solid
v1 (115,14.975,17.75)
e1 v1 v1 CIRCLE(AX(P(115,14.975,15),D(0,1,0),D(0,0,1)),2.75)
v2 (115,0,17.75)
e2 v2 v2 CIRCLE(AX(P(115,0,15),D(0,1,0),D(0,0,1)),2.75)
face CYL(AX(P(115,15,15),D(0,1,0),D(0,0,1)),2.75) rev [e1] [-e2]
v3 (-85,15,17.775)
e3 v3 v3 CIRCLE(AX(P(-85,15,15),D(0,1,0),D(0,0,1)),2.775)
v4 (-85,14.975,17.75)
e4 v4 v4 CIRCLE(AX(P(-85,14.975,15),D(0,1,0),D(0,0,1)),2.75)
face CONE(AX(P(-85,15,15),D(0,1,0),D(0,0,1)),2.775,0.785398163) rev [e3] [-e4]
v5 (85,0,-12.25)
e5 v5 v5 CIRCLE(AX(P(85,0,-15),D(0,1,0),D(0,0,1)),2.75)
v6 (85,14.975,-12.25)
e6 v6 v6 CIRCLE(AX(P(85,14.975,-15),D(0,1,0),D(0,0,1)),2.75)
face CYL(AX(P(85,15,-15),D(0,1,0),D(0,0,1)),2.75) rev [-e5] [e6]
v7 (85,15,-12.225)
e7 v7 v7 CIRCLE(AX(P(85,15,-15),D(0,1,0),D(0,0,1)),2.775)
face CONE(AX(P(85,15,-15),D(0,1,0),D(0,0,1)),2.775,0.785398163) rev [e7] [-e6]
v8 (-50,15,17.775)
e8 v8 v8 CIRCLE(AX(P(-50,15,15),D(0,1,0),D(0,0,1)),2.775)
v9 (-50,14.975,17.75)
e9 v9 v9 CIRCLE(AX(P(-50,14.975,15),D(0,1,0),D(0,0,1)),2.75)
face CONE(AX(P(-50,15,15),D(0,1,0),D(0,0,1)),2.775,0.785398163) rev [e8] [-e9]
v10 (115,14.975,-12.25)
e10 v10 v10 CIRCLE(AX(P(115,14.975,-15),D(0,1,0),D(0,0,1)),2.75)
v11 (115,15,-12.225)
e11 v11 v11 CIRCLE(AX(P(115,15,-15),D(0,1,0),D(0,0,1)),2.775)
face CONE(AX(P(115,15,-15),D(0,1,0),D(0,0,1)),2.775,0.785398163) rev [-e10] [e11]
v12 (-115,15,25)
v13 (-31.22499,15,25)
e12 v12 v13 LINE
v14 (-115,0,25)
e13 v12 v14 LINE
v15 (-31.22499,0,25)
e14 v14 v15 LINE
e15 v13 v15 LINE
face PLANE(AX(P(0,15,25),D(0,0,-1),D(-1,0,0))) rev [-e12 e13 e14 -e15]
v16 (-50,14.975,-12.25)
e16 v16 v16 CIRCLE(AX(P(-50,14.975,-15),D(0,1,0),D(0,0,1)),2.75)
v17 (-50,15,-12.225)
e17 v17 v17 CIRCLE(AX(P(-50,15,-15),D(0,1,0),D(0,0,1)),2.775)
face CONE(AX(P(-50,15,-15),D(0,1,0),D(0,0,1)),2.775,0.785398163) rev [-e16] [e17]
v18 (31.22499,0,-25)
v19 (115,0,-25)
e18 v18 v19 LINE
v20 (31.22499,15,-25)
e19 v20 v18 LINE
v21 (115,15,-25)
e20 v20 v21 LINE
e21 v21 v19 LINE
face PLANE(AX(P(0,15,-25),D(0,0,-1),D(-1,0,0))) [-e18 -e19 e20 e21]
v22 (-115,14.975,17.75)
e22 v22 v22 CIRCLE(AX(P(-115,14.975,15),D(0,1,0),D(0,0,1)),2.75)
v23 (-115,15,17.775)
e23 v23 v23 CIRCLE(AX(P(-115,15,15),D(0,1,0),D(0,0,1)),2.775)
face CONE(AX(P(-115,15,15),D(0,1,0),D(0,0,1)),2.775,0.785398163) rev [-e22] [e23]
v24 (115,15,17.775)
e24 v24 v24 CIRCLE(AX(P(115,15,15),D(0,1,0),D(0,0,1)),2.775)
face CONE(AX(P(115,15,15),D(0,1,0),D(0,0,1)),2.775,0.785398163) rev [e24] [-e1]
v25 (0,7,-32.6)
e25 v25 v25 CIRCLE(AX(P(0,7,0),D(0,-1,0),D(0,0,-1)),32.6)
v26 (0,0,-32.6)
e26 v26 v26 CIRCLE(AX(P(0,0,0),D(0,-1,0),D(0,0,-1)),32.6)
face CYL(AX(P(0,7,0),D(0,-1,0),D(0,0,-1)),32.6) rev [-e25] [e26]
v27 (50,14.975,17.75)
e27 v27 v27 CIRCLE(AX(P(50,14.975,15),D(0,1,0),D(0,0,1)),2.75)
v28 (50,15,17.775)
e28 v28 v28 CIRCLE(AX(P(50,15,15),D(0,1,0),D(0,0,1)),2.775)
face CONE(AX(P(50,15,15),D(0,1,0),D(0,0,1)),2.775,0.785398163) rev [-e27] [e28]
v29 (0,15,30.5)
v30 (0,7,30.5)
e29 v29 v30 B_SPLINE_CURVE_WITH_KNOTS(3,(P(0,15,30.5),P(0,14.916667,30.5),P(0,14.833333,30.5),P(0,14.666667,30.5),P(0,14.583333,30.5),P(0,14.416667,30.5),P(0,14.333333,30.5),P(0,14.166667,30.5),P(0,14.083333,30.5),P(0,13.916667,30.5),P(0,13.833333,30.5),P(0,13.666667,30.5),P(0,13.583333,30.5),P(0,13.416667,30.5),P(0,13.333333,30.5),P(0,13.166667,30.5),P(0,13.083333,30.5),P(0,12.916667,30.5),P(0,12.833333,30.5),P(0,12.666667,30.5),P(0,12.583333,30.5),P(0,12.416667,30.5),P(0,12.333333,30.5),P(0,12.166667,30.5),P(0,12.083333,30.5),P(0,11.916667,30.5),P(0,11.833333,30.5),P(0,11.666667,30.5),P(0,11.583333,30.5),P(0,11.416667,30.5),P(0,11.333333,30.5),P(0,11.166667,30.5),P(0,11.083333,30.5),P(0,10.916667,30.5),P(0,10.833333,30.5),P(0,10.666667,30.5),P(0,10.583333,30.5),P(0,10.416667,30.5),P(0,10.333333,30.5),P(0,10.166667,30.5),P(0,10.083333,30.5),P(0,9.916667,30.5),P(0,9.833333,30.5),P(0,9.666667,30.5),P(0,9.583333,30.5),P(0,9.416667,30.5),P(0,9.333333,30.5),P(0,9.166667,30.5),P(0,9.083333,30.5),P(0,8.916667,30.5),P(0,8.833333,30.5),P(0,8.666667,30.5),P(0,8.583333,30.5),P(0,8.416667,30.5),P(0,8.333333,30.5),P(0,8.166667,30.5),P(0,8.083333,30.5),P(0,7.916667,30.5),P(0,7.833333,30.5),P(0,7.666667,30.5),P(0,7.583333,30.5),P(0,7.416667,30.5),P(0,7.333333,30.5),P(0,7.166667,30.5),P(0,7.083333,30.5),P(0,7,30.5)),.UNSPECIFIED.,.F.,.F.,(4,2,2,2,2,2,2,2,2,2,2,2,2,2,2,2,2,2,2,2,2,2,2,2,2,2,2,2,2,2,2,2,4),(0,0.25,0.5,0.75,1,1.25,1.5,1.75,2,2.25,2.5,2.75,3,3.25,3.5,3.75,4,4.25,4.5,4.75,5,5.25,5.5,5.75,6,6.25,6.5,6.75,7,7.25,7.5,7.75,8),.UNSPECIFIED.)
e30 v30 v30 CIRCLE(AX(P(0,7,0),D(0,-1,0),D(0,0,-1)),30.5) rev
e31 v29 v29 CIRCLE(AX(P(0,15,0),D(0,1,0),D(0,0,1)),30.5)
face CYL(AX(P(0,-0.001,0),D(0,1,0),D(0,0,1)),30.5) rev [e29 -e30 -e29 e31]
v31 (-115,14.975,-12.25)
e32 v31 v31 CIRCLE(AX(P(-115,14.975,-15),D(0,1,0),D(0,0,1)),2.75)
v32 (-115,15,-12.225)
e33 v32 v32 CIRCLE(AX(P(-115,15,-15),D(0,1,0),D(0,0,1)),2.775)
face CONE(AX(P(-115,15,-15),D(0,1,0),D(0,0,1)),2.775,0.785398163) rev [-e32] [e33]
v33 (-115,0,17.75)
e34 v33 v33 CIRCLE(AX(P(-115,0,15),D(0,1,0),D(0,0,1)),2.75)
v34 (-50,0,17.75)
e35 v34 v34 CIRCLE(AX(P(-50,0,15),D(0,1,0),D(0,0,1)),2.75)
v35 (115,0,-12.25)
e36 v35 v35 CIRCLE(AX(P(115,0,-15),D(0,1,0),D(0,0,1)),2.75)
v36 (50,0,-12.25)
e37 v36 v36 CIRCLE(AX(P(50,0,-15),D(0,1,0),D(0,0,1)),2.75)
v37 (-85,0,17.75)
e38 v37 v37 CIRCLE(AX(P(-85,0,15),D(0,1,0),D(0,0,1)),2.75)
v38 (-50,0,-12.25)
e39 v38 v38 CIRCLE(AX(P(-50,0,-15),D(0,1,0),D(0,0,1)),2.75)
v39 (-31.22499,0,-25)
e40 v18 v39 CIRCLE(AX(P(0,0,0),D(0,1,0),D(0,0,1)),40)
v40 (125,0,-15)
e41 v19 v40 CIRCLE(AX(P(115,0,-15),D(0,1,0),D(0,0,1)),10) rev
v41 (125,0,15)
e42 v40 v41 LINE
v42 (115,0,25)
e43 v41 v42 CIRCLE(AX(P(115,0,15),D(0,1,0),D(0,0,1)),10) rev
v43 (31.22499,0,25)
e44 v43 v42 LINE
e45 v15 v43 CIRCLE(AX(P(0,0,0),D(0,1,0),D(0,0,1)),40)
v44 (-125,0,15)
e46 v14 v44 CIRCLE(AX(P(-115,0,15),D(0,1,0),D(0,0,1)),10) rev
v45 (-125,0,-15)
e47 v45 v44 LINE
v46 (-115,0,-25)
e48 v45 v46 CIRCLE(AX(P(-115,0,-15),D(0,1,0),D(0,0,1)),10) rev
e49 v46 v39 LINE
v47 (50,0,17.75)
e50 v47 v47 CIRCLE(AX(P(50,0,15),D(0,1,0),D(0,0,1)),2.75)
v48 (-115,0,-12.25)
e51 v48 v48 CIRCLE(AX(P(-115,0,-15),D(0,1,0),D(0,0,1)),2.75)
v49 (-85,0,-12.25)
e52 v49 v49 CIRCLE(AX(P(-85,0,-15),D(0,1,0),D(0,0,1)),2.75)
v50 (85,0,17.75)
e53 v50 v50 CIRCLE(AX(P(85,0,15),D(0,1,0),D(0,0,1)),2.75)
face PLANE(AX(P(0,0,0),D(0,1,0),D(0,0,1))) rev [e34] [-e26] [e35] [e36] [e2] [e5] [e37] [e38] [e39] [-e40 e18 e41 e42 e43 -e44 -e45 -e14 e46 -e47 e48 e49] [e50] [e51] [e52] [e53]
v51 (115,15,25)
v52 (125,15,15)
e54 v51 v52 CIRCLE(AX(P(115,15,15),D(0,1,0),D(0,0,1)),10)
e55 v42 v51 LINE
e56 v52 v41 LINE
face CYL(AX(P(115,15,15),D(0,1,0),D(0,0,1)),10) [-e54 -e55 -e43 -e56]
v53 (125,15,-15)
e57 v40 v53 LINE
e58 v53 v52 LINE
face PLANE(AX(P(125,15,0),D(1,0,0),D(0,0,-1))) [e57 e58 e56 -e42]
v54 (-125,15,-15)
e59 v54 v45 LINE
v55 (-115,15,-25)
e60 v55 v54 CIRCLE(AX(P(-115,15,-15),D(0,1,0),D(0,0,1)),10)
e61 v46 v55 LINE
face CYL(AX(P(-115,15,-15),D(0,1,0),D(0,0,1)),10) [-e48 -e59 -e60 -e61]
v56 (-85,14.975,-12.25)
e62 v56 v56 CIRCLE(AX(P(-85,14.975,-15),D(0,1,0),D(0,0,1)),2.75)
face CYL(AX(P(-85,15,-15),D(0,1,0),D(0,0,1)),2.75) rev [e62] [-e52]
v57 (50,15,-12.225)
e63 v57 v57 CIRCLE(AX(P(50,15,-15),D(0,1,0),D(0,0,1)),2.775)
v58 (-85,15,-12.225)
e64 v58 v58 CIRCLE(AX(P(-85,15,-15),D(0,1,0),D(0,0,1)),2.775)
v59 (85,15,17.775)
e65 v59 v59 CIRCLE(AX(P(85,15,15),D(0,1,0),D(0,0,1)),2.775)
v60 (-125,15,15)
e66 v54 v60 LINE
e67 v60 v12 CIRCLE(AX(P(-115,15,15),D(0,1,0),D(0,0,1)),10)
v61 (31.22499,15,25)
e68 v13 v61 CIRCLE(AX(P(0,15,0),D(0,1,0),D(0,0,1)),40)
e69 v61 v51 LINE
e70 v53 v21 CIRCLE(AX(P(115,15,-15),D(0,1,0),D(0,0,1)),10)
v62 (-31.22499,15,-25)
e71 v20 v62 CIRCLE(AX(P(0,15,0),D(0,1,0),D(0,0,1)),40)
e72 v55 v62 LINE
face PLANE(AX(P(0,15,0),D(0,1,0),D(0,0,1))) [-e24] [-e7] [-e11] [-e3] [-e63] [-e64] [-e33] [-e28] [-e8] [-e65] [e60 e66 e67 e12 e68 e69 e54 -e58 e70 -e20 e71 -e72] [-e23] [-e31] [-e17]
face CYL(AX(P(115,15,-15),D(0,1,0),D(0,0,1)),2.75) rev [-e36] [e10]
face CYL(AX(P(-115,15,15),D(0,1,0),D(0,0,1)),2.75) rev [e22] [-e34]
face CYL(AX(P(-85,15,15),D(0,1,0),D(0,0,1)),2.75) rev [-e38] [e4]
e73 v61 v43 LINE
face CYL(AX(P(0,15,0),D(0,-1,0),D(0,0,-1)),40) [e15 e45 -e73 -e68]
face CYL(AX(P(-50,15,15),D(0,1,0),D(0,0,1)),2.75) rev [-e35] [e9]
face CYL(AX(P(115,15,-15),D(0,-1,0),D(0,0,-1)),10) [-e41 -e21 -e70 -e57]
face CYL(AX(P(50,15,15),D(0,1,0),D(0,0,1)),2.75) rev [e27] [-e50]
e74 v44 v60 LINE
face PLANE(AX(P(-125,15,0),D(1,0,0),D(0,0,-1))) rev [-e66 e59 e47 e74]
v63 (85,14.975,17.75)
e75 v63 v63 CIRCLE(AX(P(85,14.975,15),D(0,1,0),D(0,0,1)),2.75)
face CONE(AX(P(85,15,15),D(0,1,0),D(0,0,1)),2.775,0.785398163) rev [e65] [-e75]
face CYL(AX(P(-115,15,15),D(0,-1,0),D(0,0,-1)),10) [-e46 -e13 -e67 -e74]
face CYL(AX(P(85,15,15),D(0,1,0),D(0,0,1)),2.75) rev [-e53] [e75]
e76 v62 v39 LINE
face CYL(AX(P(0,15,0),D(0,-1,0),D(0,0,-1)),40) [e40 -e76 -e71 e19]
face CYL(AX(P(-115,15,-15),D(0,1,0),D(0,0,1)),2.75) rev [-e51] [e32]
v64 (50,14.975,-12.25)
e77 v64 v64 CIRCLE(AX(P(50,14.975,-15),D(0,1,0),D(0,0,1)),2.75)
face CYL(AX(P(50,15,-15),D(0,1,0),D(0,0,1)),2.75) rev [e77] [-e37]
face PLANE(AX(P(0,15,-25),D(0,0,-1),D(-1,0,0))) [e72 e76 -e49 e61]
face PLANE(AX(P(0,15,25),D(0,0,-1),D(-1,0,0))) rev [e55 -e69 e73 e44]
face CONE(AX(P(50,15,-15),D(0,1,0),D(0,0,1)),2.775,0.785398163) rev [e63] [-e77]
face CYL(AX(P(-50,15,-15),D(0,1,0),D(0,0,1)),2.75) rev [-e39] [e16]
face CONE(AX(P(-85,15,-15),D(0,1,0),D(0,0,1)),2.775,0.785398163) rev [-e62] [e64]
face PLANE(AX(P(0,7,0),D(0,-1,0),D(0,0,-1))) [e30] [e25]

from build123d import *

# Parameters (mm, degrees)
BOSS_EXTRUDE1_DEPTH = 15
CUT_EXTRUDE3_REACH  = 134.098
SKETCH4_R           = 30.5
SKETCH3_R           = 32.6
CUT_EXTRUDE4_DEPTH  = 7
FILLET1_R           = 10


# Read off the part's stored shape, not the designer's step: M5 Clearance Hole1
with BuildPart() as part:
    # Sketch1 → Boss-Extrude1 (new body)
    with BuildSketch(Plane(origin=(0, 0, 0), x_dir=(1, 0, 0), z_dir=(0, 1, 0))):
        with BuildLine():
            ThreePointArc((31.224989992, 25), (0, 40), (-31.224989992, 25))
            Line((-31.224989992, 25), (31.224989992, 25))
        make_face()
        with BuildLine():
            Line((31.224989992, 25), (-31.224989992, 25))
            ThreePointArc((-31.224989992, 25), (-40, 0), (-31.224989992, -25))
            Line((-31.224989992, -25), (31.224989992, -25))
            ThreePointArc((31.224989992, -25), (37.742546282, -13.247648854), (40, 0))
            ThreePointArc((40, 0), (37.742546282, 13.247648854), (31.224989992, 25))
        make_face()
        with BuildLine():
            Line((-31.224989992, 25), (-125, 25))
            Line((-125, 25), (-125, -25))
            Line((-125, -25), (-31.224989992, -25))
            ThreePointArc((-31.224989992, -25), (-40, 0), (-31.224989992, 25))
        make_face()
        with BuildLine():
            Line((125, 25), (31.224989992, 25))
            ThreePointArc((31.224989992, 25), (37.742546282, 13.247648854), (40, 0))
            ThreePointArc((40, 0), (37.742546282, -13.247648854), (31.224989992, -25))
            Line((31.224989992, -25), (125, -25))
            Line((125, -25), (125, 25))
        make_face()
        with BuildLine():
            Line((31.224989992, -25), (-31.224989992, -25))
            ThreePointArc((-31.224989992, -25), (0, -40), (31.224989992, -25))
        make_face()
    extrude(amount=BOSS_EXTRUDE1_DEPTH)

    # Sketch4 → Cut-Extrude3 (cut, up to next)
    with BuildSketch(Plane(origin=(0, 15, 0), x_dir=(1, 0, 0), z_dir=(0, 1, 0)), mode=Mode.PRIVATE) as cut_extrude3_sk1:
        with Locations(Location((0, 0, 0), (0, 0, 270))):
            Circle(SKETCH4_R)
    cut_extrude3_tool1 = extrude(cut_extrude3_sk1.sketch, amount=-CUT_EXTRUDE3_REACH, mode=Mode.PRIVATE) & part.part
    add(cut_extrude3_tool1.solids().sort_by_distance((0, 15, 0))[0], mode=Mode.SUBTRACT)

    # Sketch3 → Cut-Extrude4 (cut)
    with BuildSketch(Plane.XZ):
        with Locations(Location((0, 0, 0), (0, 0, 270))):
            Circle(SKETCH3_R)
    extrude(amount=-CUT_EXTRUDE4_DEPTH, mode=Mode.SUBTRACT)

    # M5 Clearance Hole1 outline → M5 Clearance Hole1 (revolve, cut)
    with BuildSketch(Plane(origin=(-50, 0, 15), x_dir=(1, 0, 0), z_dir=(0, 0, 1))):
        Polygon((0, 0), (2.75, 0), (2.75, 14.975), (2.775, 15), (0, 15), align=None)
    revolve(axis=Axis((-50, 0, 15), (0, 1, 0)), mode=Mode.SUBTRACT)

    # M5 Clearance Hole1 2 outline → M5 Clearance Hole1 2 (revolve, cut)
    with BuildSketch(Plane(origin=(-50, 0, -15), x_dir=(1, 0, 0), z_dir=(0, 0, 1))):
        Polygon((0, 0), (2.75, 0), (2.75, 14.975), (2.775, 15), (0, 15), align=None)
    revolve(axis=Axis((-50, 0, -15), (0, 1, 0)), mode=Mode.SUBTRACT)

    # M5 Clearance Hole1 3 outline → M5 Clearance Hole1 3 (revolve, cut)
    with BuildSketch(Plane(origin=(50, 0, 15), x_dir=(1, 0, 0), z_dir=(0, 0, 1))):
        Polygon((0, 0), (2.75, 0), (2.75, 14.975), (2.775, 15), (0, 15), align=None)
    revolve(axis=Axis((50, 0, 15), (0, 1, 0)), mode=Mode.SUBTRACT)

    # M5 Clearance Hole1 4 outline → M5 Clearance Hole1 4 (revolve, cut)
    with BuildSketch(Plane(origin=(50, 0, -15), x_dir=(1, 0, 0), z_dir=(0, 0, 1))):
        Polygon((0, 0), (2.75, 0), (2.75, 14.975), (2.775, 15), (0, 15), align=None)
    revolve(axis=Axis((50, 0, -15), (0, 1, 0)), mode=Mode.SUBTRACT)

    # M5 Clearance Hole1 5 outline → M5 Clearance Hole1 5 (revolve, cut)
    with BuildSketch(Plane(origin=(115, 0, -15), x_dir=(1, 0, 0), z_dir=(0, 0, 1))):
        Polygon((0, 0), (2.75, 0), (2.75, 14.975), (2.775, 15), (0, 15), align=None)
    revolve(axis=Axis((115, 0, -15), (0, 1, 0)), mode=Mode.SUBTRACT)

    # M5 Clearance Hole1 6 outline → M5 Clearance Hole1 6 (revolve, cut)
    with BuildSketch(Plane(origin=(85, 0, 15), x_dir=(1, 0, 0), z_dir=(0, 0, 1))):
        Polygon((0, 0), (2.75, 0), (2.75, 14.975), (2.775, 15), (0, 15), align=None)
    revolve(axis=Axis((85, 0, 15), (0, 1, 0)), mode=Mode.SUBTRACT)

    # M5 Clearance Hole1 7 outline → M5 Clearance Hole1 7 (revolve, cut)
    with BuildSketch(Plane(origin=(115, 0, 15), x_dir=(1, 0, 0), z_dir=(0, 0, 1))):
        Polygon((0, 0), (2.75, 0), (2.75, 14.975), (2.775, 15), (0, 15), align=None)
    revolve(axis=Axis((115, 0, 15), (0, 1, 0)), mode=Mode.SUBTRACT)

    # M5 Clearance Hole1 8 outline → M5 Clearance Hole1 8 (revolve, cut)
    with BuildSketch(Plane(origin=(85, 0, -15), x_dir=(1, 0, 0), z_dir=(0, 0, 1))):
        Polygon((0, 0), (2.75, 0), (2.75, 14.975), (2.775, 15), (0, 15), align=None)
    revolve(axis=Axis((85, 0, -15), (0, 1, 0)), mode=Mode.SUBTRACT)

    # M5 Clearance Hole1 9 outline → M5 Clearance Hole1 9 (revolve, cut)
    with BuildSketch(Plane(origin=(-85, 0, -15), x_dir=(1, 0, 0), z_dir=(0, 0, 1))):
        Polygon((0, 0), (2.75, 0), (2.75, 14.975), (2.775, 15), (0, 15), align=None)
    revolve(axis=Axis((-85, 0, -15), (0, 1, 0)), mode=Mode.SUBTRACT)

    # M5 Clearance Hole1 10 outline → M5 Clearance Hole1 10 (revolve, cut)
    with BuildSketch(Plane(origin=(-115, 0, 15), x_dir=(1, 0, 0), z_dir=(0, 0, 1))):
        Polygon((0, 0), (2.75, 0), (2.75, 14.975), (2.775, 15), (0, 15), align=None)
    revolve(axis=Axis((-115, 0, 15), (0, 1, 0)), mode=Mode.SUBTRACT)

    # M5 Clearance Hole1 11 outline → M5 Clearance Hole1 11 (revolve, cut)
    with BuildSketch(Plane(origin=(-85, 0, 15), x_dir=(1, 0, 0), z_dir=(0, 0, 1))):
        Polygon((0, 0), (2.75, 0), (2.75, 14.975), (2.775, 15), (0, 15), align=None)
    revolve(axis=Axis((-85, 0, 15), (0, 1, 0)), mode=Mode.SUBTRACT)

    # M5 Clearance Hole1 12 outline → M5 Clearance Hole1 12 (revolve, cut)
    with BuildSketch(Plane(origin=(-115, 0, -15), x_dir=(1, 0, 0), z_dir=(0, 0, 1))):
        Polygon((0, 0), (2.75, 0), (2.75, 14.975), (2.775, 15), (0, 15), align=None)
    revolve(axis=Axis((-115, 0, -15), (0, 1, 0)), mode=Mode.SUBTRACT)

    # Fillet1
    fillet1_edges = [part.edges().sort_by_distance(p)[0] for p in [
        (125, 7.5, -25),
        (125, 7.5, 25),
        (-125, 7.5, 25),
        (-125, 7.5, -25),
    ]]
    fillet(fillet1_edges, radius=FILLET1_R)


solid = part.part
